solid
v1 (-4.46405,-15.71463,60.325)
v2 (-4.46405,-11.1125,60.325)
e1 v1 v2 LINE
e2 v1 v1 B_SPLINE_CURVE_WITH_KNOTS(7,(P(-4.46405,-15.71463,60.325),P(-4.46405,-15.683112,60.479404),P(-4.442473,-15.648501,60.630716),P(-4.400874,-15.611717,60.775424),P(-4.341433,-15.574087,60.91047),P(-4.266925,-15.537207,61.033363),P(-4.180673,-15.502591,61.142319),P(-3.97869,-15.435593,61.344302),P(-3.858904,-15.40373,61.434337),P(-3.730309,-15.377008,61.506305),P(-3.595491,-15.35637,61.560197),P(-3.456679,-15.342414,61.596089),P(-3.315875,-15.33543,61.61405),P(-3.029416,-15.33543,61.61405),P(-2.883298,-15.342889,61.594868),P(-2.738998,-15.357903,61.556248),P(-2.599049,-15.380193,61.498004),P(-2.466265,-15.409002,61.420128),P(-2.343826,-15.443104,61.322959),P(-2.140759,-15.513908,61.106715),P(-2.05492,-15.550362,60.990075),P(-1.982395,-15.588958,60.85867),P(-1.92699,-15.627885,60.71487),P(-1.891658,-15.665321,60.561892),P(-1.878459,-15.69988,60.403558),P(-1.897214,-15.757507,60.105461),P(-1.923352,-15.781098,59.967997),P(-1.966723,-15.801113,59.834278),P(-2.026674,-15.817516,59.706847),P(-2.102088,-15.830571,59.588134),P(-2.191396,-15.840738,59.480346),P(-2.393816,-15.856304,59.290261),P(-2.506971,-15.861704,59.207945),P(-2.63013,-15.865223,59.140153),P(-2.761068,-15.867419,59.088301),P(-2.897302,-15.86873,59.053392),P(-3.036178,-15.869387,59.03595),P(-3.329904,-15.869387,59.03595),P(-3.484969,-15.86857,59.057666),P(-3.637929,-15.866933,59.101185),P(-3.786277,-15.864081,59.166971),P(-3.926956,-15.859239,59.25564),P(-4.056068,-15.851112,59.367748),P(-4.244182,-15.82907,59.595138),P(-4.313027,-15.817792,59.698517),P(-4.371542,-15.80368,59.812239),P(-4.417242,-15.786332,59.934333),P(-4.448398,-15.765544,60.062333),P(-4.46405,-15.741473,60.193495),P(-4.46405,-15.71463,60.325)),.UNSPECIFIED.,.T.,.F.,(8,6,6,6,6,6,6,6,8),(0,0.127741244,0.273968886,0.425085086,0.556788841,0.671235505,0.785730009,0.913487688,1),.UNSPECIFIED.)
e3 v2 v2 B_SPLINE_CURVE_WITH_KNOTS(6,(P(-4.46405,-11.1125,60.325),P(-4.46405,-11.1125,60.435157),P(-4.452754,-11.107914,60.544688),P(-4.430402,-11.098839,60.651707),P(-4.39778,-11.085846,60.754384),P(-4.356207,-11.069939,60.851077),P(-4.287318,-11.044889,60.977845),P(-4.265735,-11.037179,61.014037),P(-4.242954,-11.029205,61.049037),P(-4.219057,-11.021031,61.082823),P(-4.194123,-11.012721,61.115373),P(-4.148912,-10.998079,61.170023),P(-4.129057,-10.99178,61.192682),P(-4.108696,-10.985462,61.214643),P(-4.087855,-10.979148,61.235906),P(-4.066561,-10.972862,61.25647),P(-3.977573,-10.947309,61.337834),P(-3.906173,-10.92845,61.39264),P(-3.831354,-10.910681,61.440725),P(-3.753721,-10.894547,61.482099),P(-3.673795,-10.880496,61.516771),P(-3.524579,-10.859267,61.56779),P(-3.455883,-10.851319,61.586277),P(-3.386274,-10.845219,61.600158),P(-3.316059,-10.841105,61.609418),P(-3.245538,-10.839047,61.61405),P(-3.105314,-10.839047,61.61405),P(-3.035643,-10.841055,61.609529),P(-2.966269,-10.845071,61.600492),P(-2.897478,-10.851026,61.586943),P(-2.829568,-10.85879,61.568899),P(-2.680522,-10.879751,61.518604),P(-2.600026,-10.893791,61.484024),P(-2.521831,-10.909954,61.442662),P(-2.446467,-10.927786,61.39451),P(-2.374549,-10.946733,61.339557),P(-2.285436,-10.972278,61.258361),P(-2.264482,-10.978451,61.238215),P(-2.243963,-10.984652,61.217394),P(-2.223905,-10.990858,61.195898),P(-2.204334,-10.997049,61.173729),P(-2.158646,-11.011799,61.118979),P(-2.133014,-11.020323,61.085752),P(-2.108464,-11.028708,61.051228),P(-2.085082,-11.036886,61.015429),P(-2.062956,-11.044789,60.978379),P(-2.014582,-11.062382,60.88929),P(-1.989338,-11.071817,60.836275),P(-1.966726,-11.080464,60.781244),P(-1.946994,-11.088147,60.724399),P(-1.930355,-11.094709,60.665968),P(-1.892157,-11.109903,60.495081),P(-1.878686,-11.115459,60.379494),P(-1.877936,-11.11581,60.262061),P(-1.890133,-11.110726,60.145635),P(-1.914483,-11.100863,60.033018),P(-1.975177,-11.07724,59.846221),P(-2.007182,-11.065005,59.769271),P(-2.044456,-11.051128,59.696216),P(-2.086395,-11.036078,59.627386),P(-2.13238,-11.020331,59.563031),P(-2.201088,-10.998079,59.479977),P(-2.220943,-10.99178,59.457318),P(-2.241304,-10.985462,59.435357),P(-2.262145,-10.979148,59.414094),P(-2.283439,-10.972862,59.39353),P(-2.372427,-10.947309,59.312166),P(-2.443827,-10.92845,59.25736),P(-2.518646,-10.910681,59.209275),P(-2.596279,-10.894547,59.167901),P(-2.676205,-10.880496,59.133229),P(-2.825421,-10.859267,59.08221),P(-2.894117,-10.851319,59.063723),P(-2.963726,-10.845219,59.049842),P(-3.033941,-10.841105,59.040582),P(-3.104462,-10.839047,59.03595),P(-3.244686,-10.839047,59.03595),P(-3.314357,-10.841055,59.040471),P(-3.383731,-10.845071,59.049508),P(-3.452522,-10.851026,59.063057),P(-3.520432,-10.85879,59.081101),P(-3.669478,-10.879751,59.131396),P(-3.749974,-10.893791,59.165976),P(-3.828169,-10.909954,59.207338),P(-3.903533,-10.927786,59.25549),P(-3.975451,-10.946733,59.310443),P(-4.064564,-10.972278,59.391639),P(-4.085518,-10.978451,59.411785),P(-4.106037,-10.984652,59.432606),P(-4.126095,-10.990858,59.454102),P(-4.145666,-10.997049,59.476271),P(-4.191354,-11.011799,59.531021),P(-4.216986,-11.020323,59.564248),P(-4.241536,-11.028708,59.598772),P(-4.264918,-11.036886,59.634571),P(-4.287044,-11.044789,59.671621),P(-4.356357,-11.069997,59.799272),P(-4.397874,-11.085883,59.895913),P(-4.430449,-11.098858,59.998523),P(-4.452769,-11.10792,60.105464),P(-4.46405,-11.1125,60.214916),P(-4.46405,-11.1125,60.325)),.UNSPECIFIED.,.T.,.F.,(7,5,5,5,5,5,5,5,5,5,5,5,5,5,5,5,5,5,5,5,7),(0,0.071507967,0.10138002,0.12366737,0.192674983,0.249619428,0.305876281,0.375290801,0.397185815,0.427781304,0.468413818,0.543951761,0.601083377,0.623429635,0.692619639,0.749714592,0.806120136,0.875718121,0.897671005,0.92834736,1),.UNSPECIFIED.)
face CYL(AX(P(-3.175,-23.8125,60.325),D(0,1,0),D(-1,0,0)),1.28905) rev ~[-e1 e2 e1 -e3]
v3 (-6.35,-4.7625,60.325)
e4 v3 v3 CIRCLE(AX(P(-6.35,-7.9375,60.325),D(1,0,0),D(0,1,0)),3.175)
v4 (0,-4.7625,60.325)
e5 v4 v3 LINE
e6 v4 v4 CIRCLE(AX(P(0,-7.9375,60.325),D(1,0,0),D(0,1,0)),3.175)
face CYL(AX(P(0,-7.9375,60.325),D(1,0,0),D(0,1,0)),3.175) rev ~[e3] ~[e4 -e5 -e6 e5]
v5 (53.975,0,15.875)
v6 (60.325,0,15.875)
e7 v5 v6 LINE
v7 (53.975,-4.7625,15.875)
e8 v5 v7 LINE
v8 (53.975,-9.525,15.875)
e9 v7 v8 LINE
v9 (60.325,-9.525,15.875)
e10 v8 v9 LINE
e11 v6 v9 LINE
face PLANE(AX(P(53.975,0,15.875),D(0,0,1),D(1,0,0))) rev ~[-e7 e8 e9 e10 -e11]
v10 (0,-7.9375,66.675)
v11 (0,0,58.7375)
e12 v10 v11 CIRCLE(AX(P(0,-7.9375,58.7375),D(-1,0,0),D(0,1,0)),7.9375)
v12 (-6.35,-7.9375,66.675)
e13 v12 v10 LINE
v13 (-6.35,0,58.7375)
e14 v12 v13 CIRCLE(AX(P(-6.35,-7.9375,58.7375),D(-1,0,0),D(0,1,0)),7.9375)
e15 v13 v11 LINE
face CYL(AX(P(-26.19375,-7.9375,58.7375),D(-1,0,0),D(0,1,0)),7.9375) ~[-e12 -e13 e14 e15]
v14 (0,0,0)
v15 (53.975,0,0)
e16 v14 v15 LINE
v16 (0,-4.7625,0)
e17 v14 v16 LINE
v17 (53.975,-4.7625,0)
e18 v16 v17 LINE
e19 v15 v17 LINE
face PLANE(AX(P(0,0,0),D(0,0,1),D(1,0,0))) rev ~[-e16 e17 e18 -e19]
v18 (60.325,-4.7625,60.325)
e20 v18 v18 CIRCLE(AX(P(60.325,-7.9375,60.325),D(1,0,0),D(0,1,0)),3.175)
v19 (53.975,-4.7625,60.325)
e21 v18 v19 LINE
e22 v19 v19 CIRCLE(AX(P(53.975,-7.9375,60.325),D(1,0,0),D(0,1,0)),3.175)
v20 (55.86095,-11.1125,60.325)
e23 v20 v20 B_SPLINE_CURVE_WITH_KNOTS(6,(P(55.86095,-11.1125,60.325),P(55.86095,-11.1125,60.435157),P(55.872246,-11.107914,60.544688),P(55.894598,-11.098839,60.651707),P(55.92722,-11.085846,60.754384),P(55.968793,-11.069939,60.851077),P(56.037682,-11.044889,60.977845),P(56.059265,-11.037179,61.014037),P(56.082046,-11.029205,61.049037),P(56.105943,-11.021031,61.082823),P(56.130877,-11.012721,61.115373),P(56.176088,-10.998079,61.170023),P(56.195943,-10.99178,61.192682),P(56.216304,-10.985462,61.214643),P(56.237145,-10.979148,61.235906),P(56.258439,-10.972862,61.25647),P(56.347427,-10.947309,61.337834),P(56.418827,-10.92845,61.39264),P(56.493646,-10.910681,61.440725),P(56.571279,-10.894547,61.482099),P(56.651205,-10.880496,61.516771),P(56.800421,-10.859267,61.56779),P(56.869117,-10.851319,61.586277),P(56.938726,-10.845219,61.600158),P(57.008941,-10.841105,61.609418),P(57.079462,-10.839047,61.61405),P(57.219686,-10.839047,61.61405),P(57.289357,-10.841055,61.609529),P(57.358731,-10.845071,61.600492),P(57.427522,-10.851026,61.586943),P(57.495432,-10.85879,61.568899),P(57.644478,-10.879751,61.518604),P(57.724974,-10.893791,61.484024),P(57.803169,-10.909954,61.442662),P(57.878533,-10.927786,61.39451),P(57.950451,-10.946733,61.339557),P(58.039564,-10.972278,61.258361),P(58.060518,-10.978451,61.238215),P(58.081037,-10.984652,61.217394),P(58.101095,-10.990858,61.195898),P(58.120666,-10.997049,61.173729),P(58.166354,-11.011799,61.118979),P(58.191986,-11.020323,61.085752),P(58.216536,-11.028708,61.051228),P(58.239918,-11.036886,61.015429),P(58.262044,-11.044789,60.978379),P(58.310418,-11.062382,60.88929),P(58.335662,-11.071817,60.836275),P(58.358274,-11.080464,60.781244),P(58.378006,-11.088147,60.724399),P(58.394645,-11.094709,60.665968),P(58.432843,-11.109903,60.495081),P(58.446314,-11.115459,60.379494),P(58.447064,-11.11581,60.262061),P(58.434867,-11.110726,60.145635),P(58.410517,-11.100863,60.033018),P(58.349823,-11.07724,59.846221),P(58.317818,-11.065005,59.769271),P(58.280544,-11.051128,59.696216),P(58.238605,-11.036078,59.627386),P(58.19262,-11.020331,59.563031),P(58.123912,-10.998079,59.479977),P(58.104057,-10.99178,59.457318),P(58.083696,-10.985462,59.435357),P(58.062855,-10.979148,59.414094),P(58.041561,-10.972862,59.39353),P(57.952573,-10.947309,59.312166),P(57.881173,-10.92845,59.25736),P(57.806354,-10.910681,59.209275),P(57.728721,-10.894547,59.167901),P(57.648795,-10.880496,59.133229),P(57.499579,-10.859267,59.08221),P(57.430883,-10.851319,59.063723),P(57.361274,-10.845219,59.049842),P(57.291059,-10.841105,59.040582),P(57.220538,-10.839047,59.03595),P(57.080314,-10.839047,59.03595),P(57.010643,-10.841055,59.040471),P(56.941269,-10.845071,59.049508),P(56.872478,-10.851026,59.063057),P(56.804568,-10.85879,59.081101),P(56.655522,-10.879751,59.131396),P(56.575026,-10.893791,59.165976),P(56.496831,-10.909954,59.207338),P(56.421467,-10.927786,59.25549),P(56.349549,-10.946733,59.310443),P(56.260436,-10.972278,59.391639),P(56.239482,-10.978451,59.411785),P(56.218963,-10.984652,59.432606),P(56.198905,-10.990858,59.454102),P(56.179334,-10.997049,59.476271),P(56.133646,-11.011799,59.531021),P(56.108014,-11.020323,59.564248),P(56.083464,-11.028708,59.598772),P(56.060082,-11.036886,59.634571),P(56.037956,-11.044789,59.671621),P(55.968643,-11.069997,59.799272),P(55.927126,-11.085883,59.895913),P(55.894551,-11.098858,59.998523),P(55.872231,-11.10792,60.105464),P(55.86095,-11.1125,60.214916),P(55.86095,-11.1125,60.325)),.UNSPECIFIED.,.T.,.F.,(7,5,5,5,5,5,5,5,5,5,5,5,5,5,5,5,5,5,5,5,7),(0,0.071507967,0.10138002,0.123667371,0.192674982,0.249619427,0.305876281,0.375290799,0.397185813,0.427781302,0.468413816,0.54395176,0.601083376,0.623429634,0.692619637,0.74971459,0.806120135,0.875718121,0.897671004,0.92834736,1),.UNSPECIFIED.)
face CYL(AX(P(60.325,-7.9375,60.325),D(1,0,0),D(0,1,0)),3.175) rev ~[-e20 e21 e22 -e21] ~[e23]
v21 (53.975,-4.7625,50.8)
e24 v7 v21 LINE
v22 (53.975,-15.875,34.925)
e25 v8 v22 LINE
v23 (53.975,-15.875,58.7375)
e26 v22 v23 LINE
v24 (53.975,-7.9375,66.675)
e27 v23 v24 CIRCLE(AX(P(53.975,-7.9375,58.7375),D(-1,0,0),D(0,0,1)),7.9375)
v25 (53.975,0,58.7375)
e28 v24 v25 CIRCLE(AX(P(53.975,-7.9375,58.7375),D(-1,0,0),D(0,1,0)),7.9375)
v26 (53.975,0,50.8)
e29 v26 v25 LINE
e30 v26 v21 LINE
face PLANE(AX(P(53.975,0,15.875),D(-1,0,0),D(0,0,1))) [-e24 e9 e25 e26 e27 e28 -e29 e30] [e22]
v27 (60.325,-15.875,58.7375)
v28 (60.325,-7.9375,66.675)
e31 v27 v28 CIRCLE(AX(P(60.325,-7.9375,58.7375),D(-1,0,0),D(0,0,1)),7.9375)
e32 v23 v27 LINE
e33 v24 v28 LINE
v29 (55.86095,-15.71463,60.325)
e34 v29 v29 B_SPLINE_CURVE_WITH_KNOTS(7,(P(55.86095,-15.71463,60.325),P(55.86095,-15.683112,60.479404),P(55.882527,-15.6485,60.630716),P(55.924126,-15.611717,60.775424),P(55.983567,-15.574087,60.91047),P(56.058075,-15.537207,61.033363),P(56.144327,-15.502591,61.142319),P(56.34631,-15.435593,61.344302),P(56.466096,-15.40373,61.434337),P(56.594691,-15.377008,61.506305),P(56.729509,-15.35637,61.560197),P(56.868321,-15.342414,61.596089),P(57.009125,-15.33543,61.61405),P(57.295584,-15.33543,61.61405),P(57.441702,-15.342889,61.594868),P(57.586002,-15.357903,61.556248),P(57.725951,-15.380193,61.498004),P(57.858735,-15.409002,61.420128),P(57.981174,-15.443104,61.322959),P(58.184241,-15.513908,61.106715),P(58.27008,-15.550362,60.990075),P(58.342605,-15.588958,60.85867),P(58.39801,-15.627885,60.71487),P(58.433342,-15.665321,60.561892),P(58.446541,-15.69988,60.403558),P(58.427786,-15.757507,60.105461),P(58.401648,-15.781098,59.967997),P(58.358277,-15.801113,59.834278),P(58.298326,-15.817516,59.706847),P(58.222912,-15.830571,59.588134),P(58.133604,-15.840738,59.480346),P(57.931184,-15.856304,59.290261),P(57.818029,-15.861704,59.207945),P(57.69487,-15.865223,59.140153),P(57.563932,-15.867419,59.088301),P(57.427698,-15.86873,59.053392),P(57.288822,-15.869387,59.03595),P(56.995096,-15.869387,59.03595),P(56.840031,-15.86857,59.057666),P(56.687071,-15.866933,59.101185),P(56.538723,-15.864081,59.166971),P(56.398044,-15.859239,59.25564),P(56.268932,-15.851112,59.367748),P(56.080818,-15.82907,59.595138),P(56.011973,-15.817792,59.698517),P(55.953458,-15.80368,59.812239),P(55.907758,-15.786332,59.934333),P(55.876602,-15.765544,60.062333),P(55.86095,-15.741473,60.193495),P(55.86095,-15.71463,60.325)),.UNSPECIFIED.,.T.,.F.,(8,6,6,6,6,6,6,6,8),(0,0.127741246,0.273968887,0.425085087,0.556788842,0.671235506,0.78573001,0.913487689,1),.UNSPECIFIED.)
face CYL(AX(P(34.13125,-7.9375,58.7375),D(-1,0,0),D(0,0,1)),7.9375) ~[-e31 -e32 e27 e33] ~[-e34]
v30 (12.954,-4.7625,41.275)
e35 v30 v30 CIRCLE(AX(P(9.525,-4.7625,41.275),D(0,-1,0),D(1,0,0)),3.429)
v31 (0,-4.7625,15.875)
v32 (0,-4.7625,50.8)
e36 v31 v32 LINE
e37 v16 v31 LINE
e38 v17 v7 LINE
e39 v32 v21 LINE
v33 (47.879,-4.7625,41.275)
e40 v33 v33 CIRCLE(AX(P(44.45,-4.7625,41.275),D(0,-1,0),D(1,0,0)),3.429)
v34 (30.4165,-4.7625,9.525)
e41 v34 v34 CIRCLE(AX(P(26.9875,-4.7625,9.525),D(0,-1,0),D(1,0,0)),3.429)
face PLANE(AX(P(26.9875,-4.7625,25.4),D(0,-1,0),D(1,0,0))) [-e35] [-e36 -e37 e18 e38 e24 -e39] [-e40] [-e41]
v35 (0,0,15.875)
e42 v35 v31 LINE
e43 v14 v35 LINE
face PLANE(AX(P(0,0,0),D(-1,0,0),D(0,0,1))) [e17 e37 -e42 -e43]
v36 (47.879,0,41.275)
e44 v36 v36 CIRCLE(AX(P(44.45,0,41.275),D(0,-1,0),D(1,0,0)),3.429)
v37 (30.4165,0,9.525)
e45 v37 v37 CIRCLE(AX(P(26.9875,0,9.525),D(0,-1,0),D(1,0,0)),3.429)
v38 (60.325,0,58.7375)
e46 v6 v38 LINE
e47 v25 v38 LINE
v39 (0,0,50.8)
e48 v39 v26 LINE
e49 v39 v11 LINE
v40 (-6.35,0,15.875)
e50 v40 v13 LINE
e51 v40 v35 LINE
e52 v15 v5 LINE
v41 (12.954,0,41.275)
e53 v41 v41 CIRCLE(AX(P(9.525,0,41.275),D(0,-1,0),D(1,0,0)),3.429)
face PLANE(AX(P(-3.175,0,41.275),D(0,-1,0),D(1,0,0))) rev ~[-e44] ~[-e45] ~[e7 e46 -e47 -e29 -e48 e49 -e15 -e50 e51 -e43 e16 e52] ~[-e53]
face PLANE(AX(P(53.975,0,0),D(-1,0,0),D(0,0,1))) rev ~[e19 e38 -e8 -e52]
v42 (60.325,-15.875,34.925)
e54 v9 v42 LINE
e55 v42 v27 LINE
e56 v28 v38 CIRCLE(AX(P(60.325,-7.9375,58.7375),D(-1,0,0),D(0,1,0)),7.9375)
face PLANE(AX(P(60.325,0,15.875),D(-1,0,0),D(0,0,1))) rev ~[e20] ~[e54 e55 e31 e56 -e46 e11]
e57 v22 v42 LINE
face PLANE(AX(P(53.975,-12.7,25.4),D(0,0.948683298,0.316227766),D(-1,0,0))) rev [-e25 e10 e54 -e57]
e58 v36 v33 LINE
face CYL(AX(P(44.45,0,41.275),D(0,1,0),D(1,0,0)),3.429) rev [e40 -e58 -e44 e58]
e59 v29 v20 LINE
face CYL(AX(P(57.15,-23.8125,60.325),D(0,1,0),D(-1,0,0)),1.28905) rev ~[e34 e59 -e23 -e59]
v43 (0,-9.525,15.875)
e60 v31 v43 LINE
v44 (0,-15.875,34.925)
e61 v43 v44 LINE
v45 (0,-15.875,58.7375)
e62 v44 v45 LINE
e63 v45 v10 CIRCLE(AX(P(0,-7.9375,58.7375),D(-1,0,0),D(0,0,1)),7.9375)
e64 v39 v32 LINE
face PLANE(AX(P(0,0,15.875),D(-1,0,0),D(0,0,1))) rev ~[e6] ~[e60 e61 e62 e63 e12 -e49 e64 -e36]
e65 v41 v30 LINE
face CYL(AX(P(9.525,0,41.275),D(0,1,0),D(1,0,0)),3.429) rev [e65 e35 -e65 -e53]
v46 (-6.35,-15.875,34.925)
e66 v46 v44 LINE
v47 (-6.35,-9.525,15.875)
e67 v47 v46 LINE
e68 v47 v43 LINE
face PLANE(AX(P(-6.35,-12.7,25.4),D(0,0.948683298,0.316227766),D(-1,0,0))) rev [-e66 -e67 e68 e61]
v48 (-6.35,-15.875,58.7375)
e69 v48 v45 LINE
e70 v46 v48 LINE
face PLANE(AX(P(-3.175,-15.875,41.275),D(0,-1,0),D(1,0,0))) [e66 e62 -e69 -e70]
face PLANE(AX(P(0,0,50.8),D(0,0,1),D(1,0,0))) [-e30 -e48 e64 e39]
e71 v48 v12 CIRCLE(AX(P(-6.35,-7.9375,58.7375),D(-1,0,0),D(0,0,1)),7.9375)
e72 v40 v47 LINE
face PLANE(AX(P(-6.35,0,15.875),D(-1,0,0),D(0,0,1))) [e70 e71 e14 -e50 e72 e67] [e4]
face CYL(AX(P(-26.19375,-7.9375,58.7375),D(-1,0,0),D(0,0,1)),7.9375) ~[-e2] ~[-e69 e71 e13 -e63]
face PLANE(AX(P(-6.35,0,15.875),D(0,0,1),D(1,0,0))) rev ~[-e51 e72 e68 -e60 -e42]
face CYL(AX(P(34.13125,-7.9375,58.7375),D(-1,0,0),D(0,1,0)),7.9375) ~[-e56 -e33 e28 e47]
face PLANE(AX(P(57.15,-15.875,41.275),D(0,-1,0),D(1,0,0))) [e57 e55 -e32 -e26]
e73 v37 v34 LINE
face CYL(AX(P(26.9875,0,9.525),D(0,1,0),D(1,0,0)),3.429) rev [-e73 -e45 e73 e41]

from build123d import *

# Parameters (mm, degrees)
F0_W         = 53.975
F0_H         = 50.8
F0_R         = 3.429
F1_DEPTH     = 4.7625
F2_W         = 6.35
F2_H         = 50.8
F3_DEPTH     = 15.875
F4_R         = 3.175
F5_DEPTH     = 6.35
F6_R         = 3.175
F7_DEPTH     = 6.35
F9_D         = 2.5781
F9_DEPTH     = 7.9375
F9_TIP       = 0.774539381
F10_T1_DEPTH = 46.0375
F10_T3_DEPTH = 46.0375
F11_SIZE2    = 19.05
F11_SIZE     = 6.35
F12_SIZE2    = 19.05
F12_SIZE     = 6.35


# Not quite as in the source:
# - a fillet or chamfer that OpenCascade refuses, or shapes differently, is made with other operations: its cross-section is extruded or revolved along the edge and cut away or added


with BuildPart() as f1:
    # F0 (on Front) → F1 (new body)
    with BuildSketch(Plane.XZ):
        with Locations((26.9875, 25.4)):
            Rectangle(F0_W, F0_H)
        with Locations((26.9875, 9.525)):
            Circle(F0_R, mode=Mode.SUBTRACT)
        with Locations((9.525, 41.275)):
            Circle(F0_R, mode=Mode.SUBTRACT)
        with Locations((44.45, 41.275)):
            Circle(F0_R, mode=Mode.SUBTRACT)
    extrude(amount=F1_DEPTH)

    # F2 (on Front) → F3 (join)
    with BuildSketch(Plane.XZ):
        with Locations((-3.175, 41.275)):
            Rectangle(F2_W, F2_H)
        with Locations((57.15, 41.275)):
            Rectangle(F2_W, F2_H)
    extrude(amount=F3_DEPTH)

    # F4 (on Right) → F5 (cut, through all)
    with BuildSketch(Plane.YZ):
        with Locations((-7.9375, 60.325)):
            Circle(F4_R)
    extrude(amount=-F5_DEPTH, mode=Mode.SUBTRACT)

    # F6 (on face) → F7 (cut)
    with BuildSketch(Plane.YZ.offset(60.325)):
        with Locations((-7.9375, 60.325)):
            Circle(F6_R)
    extrude(amount=-F7_DEPTH, mode=Mode.SUBTRACT)

    # F9
    with Locations(Plane.XZ.offset(15.875)):
        with Locations((-3.175, 60.325), (57.15, 60.325)):
            Hole(F9_D / 2, depth=F9_DEPTH)
            with Locations((0, 0, -(F9_DEPTH + F9_TIP / 2))):  # 118° drill point
                Cone(0, F9_D / 2, F9_TIP, mode=Mode.SUBTRACT)

    # F10: fillet of radius 7.9375 on 4 edges, made by hand

    # F10_s2 → F10_t1 (cut)
    with BuildSketch(Plane.YZ.offset(34.13125)):
        with BuildLine():
            ThreePointArc((-7.9375, 66.675), (-13.5501600757, 64.3501600757), (-15.875, 58.7375))
            Line((-15.875, 58.7375), (-15.875, 66.675))
            Line((-15.875, 66.675), (-7.9375, 66.675))
        make_face()
        with BuildLine():
            ThreePointArc((0, 58.7375), (-2.3248399243, 64.3501600757), (-7.9375, 66.675))
            Line((-7.9375, 66.675), (0, 66.675))
            Line((0, 66.675), (0, 58.7375))
        make_face()
    extrude(amount=F10_T1_DEPTH, mode=Mode.SUBTRACT)

    # F10_s4 → F10_t3 (cut)
    with BuildSketch(Plane.YZ.offset(-26.19375)):
        with BuildLine():
            ThreePointArc((-7.9375, 66.675), (-13.5501600757, 64.3501600757), (-15.875, 58.7375))
            Line((-15.875, 58.7375), (-15.875, 66.675))
            Line((-15.875, 66.675), (-7.9375, 66.675))
        make_face()
        with BuildLine():
            ThreePointArc((0, 58.7375), (-2.3248399243, 64.3501600757), (-7.9375, 66.675))
            Line((-7.9375, 66.675), (0, 66.675))
            Line((0, 66.675), (0, 58.7375))
        make_face()
    extrude(amount=F10_T3_DEPTH, mode=Mode.SUBTRACT)

    # F11
    f11_edges = [f1.edges().sort_by_distance(p)[0] for p in [
        (-3.175, -15.875, 15.875),
    ]]
    f11_side = f1.faces().sort_by_distance((-3.175, -7.9375, 15.875))[0]
    chamfer(f11_edges, length=F11_SIZE, length2=F11_SIZE2, reference=f11_side)

    # F12
    f12_edges = [f1.edges().sort_by_distance(p)[0] for p in [
        (57.15, -15.875, 15.875),
    ]]
    f12_side = f1.faces().sort_by_distance((57.15, -7.9375, 15.875))[0]
    chamfer(f12_edges, length=F12_SIZE, length2=F12_SIZE2, reference=f12_side)


solid = f1.part
